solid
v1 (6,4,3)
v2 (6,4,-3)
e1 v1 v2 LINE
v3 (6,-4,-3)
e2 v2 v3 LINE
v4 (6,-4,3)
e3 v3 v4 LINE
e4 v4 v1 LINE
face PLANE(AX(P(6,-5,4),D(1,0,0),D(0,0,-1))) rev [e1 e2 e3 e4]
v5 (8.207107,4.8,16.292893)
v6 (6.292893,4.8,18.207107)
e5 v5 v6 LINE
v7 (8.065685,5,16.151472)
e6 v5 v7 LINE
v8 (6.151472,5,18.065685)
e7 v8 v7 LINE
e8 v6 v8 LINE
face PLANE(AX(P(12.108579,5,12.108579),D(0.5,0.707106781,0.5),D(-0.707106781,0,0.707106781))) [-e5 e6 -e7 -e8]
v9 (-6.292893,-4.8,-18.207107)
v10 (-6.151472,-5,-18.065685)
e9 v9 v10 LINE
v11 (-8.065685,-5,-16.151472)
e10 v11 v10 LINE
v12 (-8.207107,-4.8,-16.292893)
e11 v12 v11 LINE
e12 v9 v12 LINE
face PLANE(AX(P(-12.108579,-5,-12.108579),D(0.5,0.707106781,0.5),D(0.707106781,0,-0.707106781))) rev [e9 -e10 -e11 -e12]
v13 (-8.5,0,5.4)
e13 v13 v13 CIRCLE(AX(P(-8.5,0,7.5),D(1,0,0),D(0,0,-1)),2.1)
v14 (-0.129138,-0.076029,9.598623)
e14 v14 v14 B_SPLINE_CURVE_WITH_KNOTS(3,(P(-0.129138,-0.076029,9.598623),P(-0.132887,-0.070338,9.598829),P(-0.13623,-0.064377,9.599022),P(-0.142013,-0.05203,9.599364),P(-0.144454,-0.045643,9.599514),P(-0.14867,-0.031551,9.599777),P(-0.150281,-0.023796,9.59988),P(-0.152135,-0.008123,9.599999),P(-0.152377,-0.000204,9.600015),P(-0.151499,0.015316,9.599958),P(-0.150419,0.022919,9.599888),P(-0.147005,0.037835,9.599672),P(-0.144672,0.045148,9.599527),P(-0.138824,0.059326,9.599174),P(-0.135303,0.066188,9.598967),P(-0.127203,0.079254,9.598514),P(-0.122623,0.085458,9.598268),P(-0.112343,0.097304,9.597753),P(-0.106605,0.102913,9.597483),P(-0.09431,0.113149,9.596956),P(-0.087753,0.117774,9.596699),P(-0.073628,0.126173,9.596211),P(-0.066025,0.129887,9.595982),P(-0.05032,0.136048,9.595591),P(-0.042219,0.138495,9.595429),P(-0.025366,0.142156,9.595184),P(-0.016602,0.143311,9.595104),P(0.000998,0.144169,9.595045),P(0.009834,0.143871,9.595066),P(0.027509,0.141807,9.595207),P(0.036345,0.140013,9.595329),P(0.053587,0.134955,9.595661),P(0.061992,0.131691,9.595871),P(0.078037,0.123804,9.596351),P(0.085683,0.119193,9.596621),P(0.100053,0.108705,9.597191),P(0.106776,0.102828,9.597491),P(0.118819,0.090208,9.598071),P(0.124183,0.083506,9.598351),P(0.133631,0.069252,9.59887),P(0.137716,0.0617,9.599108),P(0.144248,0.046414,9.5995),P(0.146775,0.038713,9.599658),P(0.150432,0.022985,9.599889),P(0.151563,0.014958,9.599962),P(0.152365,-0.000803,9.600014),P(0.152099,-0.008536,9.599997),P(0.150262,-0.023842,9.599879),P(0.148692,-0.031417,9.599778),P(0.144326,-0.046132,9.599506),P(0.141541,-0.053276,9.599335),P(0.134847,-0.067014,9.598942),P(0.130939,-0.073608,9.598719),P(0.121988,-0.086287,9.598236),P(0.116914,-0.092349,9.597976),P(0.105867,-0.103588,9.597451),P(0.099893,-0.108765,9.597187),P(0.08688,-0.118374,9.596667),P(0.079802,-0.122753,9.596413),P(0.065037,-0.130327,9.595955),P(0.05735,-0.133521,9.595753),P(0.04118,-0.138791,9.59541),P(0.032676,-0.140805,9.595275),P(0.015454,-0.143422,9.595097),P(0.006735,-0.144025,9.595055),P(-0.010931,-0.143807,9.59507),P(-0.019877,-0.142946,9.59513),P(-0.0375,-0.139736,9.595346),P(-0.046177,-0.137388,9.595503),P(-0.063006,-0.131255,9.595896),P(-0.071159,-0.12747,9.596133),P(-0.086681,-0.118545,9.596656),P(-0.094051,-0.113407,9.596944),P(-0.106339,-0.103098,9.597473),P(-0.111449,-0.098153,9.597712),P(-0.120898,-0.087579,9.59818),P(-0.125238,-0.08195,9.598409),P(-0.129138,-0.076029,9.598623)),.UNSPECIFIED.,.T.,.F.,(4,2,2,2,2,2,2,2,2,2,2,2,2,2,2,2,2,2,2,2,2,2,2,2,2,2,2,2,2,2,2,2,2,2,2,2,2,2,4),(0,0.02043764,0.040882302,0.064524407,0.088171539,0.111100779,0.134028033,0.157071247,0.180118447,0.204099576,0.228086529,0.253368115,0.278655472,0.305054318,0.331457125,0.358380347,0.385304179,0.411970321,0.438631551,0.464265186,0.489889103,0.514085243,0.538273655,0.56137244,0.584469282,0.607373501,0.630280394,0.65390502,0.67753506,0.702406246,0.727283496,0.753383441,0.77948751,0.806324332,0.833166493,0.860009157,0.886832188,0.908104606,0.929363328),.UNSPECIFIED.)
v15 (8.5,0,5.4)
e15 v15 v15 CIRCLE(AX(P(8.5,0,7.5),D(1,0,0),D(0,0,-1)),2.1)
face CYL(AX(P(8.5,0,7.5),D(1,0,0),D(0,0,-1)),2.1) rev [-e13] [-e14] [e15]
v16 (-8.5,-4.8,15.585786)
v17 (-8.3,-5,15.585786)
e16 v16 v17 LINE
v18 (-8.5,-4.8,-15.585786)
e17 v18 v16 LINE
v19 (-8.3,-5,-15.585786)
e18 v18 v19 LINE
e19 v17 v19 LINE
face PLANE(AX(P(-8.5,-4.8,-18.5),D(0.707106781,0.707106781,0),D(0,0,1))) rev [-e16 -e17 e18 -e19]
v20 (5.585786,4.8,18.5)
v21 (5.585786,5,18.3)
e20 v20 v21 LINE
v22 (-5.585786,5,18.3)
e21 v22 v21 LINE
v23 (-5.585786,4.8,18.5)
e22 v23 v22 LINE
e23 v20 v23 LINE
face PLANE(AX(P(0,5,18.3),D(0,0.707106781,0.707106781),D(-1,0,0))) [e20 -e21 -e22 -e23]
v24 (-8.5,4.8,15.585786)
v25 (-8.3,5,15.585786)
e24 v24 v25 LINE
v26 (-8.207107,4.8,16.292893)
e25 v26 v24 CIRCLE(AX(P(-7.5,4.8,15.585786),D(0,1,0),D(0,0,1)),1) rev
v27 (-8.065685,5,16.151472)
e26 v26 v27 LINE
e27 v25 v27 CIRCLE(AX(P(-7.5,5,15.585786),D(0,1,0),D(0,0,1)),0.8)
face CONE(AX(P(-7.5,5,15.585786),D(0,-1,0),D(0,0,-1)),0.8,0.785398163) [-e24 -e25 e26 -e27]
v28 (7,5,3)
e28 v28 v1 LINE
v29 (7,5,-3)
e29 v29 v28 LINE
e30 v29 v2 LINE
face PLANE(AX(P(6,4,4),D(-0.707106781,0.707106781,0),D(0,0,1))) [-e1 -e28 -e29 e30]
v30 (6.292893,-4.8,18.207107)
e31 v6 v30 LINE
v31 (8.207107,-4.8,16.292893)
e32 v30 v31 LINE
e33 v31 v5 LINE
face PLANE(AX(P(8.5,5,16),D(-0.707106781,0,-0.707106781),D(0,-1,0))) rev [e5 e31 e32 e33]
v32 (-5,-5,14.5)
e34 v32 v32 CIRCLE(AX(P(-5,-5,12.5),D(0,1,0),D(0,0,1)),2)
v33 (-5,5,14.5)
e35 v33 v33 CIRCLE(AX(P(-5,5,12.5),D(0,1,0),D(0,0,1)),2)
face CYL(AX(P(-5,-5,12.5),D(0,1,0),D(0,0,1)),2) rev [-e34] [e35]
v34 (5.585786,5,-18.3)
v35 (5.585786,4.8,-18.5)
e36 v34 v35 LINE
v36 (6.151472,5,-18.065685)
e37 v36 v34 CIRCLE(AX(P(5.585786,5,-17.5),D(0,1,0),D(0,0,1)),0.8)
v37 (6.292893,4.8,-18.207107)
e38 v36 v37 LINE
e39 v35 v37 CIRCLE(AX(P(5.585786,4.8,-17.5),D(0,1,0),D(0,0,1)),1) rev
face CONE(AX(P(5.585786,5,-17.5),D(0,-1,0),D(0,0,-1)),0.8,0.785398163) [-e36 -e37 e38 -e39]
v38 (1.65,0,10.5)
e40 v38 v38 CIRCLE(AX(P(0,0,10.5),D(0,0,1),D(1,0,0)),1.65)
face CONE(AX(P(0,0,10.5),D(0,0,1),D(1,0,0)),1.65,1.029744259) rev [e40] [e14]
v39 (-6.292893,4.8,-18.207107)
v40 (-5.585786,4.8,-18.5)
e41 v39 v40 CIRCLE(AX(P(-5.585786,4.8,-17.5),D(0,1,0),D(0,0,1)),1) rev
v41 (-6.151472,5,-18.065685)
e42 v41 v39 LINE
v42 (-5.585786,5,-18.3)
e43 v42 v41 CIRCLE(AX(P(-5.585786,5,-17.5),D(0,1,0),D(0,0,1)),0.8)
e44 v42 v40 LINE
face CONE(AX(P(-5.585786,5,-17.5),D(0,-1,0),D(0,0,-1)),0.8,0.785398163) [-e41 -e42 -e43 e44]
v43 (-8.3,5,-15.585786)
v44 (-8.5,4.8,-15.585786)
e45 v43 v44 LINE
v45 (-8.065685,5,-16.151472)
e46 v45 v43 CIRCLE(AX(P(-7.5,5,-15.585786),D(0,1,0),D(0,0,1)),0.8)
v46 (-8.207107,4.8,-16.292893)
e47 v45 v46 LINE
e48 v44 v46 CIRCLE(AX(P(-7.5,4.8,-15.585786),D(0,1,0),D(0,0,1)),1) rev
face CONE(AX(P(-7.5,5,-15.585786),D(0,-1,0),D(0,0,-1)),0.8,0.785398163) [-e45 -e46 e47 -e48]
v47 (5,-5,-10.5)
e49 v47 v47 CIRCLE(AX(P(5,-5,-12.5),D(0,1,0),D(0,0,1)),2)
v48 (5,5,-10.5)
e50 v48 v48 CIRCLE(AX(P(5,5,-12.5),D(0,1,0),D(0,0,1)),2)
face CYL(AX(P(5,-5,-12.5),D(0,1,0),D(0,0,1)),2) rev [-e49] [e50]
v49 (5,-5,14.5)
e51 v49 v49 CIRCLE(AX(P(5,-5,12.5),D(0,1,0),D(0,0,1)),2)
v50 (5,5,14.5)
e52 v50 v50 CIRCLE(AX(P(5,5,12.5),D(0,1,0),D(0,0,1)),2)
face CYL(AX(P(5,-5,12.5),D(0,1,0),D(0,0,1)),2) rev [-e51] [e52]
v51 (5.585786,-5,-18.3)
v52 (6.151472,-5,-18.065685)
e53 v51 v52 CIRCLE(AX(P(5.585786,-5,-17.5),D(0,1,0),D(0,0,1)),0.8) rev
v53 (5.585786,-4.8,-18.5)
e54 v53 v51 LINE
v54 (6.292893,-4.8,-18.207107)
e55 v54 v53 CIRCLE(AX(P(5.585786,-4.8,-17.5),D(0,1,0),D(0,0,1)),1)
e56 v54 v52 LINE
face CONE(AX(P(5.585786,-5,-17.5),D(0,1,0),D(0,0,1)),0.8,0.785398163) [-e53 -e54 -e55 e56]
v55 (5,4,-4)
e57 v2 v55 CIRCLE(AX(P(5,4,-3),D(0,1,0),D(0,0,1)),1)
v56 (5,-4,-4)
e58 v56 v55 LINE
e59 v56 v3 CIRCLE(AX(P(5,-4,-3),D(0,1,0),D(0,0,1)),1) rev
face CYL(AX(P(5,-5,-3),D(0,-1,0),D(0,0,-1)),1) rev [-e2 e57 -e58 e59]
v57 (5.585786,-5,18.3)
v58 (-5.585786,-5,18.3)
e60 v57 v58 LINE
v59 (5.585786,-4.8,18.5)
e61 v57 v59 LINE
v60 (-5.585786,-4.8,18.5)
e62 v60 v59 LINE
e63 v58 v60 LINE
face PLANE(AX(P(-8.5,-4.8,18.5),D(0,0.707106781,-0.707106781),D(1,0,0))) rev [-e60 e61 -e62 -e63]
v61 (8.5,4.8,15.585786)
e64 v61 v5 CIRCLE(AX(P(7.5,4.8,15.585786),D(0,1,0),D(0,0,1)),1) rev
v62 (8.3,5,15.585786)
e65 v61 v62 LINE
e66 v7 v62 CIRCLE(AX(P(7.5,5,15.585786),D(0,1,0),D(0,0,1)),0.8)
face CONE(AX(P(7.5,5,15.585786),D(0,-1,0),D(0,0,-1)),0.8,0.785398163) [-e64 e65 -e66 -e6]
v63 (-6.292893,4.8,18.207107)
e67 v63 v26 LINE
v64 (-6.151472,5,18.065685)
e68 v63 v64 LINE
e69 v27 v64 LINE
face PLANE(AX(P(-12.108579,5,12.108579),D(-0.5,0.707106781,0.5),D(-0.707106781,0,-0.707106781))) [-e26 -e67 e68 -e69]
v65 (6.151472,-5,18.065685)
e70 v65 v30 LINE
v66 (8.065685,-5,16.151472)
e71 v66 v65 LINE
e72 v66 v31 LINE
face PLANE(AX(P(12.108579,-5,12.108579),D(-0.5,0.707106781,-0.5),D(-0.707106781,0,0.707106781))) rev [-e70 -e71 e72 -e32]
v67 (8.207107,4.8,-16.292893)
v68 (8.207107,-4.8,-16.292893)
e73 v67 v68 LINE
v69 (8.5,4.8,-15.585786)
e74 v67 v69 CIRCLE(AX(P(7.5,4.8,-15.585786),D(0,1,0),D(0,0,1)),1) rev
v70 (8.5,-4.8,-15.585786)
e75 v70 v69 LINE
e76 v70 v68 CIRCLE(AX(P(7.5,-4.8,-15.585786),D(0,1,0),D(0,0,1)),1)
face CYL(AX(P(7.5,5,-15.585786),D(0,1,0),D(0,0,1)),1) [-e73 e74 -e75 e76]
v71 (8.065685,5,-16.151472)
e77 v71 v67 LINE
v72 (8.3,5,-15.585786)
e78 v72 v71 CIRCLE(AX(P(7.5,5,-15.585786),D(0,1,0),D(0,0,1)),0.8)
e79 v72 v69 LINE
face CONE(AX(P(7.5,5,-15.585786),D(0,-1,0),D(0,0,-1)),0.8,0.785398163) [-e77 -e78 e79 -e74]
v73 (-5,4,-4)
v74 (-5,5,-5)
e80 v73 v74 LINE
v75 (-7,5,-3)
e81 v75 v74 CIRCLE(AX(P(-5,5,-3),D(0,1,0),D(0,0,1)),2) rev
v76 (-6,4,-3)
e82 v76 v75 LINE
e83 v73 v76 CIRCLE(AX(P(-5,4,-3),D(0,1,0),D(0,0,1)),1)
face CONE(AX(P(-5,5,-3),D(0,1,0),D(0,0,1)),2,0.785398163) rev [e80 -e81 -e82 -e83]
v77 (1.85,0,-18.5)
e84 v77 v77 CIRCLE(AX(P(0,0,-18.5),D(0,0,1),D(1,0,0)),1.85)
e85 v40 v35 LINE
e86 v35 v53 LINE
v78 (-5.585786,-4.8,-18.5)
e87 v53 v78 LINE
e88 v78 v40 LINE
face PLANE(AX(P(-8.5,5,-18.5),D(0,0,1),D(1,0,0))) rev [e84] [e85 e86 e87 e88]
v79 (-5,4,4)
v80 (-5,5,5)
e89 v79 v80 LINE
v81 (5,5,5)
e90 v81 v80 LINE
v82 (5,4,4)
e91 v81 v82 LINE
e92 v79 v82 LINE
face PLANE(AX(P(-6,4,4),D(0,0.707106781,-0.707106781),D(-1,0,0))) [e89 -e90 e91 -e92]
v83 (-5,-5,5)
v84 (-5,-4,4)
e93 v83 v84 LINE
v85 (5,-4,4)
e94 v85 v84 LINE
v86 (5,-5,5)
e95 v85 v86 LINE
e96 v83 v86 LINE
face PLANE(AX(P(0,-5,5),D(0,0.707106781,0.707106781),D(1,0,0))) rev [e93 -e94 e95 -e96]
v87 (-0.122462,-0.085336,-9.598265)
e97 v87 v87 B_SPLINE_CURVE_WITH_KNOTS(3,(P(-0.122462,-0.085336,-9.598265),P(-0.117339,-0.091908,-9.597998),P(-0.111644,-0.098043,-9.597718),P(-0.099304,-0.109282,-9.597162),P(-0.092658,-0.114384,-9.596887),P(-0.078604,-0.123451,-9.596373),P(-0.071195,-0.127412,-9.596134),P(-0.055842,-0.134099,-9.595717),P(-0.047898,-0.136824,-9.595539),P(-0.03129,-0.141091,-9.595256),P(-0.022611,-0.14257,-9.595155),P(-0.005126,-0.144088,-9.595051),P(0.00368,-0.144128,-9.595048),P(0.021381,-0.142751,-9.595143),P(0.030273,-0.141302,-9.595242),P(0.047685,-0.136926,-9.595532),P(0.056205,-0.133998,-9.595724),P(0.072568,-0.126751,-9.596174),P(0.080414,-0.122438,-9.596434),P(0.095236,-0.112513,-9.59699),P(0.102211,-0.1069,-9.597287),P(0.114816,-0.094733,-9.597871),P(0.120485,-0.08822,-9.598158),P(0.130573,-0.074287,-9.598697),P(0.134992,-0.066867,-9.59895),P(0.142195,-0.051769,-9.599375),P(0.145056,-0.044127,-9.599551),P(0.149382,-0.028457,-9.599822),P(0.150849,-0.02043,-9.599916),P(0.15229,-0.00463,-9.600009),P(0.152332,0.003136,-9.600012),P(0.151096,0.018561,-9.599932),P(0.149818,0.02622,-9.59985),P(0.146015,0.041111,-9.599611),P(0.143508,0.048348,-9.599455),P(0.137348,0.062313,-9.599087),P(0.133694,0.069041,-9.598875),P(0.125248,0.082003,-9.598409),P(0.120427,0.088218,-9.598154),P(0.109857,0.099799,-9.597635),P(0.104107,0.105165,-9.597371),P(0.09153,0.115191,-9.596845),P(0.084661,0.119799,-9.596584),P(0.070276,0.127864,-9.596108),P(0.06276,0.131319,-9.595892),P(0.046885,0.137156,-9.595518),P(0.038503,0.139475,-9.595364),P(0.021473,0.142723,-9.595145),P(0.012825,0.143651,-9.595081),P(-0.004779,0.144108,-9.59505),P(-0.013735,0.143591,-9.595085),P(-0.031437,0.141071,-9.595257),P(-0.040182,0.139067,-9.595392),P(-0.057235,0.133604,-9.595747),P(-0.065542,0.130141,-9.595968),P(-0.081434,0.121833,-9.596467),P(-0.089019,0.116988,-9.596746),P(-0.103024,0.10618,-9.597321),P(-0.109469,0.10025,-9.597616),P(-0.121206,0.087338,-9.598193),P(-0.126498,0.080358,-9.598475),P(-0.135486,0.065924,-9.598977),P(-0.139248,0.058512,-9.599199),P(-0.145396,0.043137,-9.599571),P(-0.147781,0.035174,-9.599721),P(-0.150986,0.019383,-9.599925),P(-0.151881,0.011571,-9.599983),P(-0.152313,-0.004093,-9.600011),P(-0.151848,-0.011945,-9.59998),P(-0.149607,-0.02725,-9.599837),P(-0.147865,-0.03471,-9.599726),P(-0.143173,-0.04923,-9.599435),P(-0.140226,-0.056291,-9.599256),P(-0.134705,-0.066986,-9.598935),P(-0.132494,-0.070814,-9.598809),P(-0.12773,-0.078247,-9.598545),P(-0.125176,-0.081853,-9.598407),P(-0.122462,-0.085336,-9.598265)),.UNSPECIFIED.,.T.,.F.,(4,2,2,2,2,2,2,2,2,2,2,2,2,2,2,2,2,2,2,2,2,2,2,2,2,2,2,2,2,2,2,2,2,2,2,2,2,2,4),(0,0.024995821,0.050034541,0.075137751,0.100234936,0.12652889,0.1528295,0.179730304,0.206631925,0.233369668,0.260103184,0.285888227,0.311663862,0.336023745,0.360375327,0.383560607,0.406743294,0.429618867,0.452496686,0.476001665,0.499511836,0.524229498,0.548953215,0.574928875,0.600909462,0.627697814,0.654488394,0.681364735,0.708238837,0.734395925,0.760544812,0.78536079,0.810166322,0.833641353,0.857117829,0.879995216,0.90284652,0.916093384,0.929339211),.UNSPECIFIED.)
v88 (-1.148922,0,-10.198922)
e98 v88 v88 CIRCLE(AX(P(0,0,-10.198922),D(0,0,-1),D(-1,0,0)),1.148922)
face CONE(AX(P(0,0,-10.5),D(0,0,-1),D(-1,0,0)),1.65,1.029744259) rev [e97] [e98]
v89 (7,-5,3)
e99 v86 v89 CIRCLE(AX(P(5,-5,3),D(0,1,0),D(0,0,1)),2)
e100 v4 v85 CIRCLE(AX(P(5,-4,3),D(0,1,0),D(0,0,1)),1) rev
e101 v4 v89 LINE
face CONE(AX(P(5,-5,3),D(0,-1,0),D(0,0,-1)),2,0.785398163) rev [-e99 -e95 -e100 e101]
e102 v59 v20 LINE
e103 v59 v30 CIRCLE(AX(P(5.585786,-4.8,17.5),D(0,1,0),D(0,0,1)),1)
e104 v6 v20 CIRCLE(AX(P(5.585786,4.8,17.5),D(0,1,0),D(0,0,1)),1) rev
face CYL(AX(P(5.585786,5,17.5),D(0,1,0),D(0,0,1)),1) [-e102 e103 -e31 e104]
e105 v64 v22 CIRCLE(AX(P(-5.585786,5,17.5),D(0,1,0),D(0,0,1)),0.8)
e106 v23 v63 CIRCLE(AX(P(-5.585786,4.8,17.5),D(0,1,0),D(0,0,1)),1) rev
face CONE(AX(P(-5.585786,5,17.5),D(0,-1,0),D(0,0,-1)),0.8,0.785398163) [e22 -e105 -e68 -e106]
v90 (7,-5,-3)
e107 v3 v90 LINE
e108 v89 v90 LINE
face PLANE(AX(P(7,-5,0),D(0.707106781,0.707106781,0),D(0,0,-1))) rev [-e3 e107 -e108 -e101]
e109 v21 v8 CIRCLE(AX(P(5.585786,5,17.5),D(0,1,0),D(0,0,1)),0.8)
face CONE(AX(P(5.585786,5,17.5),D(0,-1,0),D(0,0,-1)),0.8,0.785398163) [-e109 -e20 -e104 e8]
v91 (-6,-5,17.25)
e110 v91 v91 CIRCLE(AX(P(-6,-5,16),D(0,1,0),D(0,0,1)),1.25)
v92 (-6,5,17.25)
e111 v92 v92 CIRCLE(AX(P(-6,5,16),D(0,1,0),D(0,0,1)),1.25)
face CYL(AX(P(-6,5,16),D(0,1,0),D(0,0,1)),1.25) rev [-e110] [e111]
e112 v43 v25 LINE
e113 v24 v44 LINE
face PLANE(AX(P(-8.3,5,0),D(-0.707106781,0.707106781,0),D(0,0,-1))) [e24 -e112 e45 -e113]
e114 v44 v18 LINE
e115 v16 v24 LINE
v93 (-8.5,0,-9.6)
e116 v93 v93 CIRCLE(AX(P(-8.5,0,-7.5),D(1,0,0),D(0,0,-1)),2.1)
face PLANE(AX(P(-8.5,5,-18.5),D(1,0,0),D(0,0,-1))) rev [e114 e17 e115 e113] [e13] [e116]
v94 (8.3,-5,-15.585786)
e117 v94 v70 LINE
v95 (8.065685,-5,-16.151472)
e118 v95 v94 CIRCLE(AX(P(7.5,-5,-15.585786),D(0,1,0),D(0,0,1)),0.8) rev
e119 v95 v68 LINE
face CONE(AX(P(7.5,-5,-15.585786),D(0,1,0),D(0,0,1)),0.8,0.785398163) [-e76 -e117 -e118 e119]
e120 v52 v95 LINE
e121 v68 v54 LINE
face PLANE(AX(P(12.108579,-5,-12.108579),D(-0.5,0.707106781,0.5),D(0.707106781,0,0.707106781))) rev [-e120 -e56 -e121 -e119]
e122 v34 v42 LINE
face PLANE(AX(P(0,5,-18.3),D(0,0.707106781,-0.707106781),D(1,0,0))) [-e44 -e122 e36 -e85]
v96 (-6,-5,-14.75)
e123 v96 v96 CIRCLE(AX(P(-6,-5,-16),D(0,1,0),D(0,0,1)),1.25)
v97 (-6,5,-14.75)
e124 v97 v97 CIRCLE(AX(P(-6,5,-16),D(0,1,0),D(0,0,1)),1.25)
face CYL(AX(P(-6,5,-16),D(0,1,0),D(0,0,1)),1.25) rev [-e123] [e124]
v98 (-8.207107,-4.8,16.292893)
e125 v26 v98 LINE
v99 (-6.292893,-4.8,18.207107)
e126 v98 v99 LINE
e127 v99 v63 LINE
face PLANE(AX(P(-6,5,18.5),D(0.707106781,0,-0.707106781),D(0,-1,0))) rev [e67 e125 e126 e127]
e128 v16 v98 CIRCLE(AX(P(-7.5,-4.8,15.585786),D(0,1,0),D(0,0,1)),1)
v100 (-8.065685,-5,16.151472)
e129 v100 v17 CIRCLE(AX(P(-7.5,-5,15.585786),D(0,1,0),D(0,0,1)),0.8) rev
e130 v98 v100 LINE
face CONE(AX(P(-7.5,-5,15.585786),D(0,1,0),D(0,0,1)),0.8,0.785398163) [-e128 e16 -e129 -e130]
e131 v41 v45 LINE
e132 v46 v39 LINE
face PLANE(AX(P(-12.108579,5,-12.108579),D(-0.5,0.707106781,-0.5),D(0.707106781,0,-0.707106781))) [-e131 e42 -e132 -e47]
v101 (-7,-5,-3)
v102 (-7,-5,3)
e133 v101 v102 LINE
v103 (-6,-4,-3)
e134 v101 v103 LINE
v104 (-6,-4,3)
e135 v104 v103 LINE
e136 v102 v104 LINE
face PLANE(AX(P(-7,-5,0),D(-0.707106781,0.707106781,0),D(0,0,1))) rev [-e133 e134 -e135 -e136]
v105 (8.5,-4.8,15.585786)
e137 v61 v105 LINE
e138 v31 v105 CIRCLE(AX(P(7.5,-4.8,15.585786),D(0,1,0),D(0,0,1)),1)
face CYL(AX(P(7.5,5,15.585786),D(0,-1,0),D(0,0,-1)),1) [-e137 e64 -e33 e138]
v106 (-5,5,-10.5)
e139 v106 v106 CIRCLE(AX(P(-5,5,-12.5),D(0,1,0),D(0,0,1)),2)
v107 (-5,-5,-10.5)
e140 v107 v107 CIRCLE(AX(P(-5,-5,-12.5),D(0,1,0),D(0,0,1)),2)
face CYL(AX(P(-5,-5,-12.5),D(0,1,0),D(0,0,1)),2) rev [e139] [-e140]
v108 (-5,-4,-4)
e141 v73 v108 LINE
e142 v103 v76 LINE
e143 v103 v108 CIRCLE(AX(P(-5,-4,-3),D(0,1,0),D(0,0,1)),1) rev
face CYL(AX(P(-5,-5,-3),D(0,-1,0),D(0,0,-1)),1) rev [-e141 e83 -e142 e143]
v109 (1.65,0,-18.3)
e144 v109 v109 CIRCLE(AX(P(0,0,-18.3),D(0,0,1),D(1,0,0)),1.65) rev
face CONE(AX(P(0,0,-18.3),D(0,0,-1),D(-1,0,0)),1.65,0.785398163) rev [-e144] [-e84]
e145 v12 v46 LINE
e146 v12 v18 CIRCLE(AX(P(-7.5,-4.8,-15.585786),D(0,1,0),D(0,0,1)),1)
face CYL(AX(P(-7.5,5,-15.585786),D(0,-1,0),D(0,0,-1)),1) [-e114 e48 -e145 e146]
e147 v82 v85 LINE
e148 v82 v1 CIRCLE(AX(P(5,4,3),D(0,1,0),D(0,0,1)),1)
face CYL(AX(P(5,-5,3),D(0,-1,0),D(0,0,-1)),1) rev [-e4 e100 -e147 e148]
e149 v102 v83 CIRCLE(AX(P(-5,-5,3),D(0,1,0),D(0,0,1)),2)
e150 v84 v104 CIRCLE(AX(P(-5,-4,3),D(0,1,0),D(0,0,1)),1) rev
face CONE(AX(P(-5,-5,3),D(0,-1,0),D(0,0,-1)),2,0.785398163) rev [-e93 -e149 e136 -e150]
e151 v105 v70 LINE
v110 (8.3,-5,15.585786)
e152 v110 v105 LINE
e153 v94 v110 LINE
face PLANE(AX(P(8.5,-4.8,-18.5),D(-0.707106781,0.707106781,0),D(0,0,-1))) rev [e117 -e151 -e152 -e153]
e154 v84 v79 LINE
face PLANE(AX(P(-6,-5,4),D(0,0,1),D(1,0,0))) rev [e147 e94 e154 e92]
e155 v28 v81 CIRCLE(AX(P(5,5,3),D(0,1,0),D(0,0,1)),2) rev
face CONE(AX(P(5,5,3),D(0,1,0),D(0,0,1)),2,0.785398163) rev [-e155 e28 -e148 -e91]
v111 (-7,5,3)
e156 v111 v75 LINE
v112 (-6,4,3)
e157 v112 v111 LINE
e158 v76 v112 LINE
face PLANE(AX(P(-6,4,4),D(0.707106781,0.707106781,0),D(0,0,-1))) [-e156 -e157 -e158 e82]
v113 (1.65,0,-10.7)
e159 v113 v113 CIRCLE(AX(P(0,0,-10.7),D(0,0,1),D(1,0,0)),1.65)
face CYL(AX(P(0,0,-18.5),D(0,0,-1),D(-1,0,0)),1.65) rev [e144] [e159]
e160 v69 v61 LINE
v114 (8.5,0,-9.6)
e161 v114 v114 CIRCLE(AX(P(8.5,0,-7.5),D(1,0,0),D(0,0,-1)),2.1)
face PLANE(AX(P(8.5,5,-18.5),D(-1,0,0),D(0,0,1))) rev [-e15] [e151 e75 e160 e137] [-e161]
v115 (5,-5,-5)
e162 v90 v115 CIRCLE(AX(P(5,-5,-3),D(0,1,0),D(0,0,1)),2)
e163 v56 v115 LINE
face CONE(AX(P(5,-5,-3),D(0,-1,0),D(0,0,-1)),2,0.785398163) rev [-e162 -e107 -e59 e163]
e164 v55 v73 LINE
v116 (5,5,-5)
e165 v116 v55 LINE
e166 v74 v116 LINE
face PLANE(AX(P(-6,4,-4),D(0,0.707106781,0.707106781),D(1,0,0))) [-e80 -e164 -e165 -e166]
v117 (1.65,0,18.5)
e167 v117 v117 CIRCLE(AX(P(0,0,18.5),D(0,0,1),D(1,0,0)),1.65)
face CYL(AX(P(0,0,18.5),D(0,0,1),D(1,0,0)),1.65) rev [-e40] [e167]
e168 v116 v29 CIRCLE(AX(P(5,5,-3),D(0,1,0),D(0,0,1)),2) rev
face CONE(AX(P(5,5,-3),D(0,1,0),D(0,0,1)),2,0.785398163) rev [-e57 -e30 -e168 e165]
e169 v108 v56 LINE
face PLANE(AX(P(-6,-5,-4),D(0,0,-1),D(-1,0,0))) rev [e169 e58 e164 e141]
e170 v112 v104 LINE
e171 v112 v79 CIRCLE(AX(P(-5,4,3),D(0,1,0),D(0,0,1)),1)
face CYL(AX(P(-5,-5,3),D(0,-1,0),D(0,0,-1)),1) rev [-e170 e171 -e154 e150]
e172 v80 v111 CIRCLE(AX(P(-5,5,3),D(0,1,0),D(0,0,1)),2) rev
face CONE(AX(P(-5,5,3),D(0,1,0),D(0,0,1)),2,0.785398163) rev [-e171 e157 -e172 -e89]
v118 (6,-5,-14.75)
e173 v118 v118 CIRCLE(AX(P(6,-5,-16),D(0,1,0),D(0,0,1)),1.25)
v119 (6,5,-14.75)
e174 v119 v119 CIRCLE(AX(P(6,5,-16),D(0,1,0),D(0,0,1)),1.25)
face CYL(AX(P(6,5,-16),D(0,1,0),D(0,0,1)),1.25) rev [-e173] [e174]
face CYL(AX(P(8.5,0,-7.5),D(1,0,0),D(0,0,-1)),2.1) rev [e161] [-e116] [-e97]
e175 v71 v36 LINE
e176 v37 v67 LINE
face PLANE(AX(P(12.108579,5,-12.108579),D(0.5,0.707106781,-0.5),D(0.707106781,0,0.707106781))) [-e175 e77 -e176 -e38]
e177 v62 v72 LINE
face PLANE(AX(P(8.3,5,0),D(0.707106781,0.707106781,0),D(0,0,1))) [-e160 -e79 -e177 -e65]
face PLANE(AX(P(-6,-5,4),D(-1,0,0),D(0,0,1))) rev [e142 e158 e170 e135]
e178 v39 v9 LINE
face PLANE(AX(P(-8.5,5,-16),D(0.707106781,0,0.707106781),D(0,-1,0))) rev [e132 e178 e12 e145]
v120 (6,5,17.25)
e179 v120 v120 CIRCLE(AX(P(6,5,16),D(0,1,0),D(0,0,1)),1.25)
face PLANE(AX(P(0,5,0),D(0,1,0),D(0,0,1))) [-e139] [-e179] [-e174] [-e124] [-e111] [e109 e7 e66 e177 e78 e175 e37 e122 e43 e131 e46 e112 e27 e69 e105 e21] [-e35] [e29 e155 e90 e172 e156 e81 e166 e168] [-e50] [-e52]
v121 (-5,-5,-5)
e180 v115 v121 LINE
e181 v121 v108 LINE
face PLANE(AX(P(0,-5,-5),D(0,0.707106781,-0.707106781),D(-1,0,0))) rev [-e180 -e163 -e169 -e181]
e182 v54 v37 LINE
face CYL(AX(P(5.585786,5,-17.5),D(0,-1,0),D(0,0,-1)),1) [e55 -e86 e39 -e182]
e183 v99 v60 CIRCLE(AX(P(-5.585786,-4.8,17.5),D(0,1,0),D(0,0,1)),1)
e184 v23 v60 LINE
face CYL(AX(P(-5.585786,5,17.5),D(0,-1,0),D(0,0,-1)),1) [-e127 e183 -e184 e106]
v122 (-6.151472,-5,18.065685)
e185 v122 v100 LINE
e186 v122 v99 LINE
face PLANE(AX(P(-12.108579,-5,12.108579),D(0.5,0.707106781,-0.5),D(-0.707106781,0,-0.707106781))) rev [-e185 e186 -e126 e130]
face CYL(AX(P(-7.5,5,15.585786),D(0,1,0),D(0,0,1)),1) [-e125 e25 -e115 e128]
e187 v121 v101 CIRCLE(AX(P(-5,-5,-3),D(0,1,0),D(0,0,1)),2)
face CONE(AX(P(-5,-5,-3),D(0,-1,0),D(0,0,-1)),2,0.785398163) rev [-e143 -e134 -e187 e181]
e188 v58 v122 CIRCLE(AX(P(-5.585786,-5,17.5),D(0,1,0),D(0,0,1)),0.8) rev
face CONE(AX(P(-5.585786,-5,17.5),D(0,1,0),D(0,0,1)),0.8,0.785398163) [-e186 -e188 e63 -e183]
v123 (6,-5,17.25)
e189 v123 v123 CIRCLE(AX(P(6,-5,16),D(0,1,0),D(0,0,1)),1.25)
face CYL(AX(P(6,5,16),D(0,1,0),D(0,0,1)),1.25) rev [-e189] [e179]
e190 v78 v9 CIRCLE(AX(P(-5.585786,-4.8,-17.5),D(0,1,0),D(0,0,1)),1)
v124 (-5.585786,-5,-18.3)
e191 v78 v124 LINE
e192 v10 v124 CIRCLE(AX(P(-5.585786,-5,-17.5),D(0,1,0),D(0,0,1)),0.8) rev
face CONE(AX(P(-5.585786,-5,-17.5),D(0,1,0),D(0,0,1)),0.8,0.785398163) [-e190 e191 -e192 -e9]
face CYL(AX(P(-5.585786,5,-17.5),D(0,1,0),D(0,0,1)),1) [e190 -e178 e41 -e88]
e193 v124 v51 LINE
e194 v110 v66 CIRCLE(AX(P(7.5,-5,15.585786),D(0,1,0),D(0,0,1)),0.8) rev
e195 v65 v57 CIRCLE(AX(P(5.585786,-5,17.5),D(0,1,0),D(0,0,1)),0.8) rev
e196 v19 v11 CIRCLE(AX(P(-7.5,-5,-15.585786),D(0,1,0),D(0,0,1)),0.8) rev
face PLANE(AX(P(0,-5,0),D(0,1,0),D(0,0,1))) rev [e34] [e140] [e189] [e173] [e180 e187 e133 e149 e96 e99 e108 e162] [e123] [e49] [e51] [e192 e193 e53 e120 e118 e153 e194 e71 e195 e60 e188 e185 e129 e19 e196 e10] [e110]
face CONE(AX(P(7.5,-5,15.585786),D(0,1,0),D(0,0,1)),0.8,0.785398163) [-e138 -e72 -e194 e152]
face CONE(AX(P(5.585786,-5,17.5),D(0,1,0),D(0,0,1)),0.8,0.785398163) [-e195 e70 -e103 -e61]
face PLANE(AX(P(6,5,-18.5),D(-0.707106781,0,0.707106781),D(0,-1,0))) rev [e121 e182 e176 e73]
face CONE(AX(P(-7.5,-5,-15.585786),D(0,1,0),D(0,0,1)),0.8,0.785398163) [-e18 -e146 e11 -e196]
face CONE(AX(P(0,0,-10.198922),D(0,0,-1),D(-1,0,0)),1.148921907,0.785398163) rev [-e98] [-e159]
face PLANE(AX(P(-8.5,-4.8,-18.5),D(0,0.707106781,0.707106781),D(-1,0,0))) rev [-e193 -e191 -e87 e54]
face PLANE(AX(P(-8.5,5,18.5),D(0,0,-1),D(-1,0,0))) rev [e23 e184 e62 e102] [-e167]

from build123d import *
from OCP.BRepFilletAPI import BRepFilletAPI_MakeChamfer

# Parameters (mm, degrees)
SKETCH_1_W          = 17
SKETCH_1_H          = 37
EXTRUDE_1_DEPTH     = 5
SKETCH_2_R          = 1.5
CUT_EXTRUDE_1_DEPTH = 26.617376915
SKETCH_3_R          = 1.6
CUT_EXTRUDE_3_DEPTH = 8
SKETCH_4_R          = 1
SKETCH_4_W          = 12
SKETCH_4_H          = 8
CUT_EXTRUDE_4_DEPTH = 23.682592444
CHAMFER_1_SIZE      = 2.5
SKETCH_6_R          = 2
CUT_EXTRUDE_5_DEPTH = 23.682592444
FILLET_1_R          = 1
HOLE_WIZARD_M3_1_D  = 2.5
CHAMFER_2_SIZE      = 0.2
CHAMFER_2_SIZE2     = 0.584574438
CHAMFER_3_SIZE      = 0.2
CHAMFER_4_SIZE      = 1
HOLE_WIZARD_M5_1_D  = 4.2


# Read off the part's stored shape, not the designer's step: M4 螺纹孔1
with BuildPart() as part:
    # 草图1 → 凸台-拉伸1 (new, symmetric)
    with BuildSketch(Plane(origin=(0, 0, 0), x_dir=(1, 0, 0), z_dir=(0, 1, 0))):
        Rectangle(SKETCH_1_W, SKETCH_1_H)
    extrude(amount=EXTRUDE_1_DEPTH, both=True)

    # 草图2 → 切除-拉伸1 (cut, through all)
    with BuildSketch(Plane(origin=(8.5, 0, 0), x_dir=(0, 0, -1), z_dir=(1, 0, 0))):
        with Locations((-7.5, 0)):
            Circle(SKETCH_2_R)
        with Locations((7.5, 0)):
            Circle(SKETCH_2_R)
    extrude(amount=-CUT_EXTRUDE_1_DEPTH, mode=Mode.SUBTRACT)

    # 草图3 → 切除-拉伸3 (cut)
    with BuildSketch(Plane(origin=(0, 0, -18.5), x_dir=(-1, 0, 0), z_dir=(0, 0, -1))):
        Circle(SKETCH_3_R)
    cut_extrude_3 = extrude(amount=-CUT_EXTRUDE_3_DEPTH, mode=Mode.SUBTRACT)

    # 草图4 → 切除-拉伸4 (cut, through all)
    with BuildSketch(Plane(origin=(0, 5, 0), x_dir=(1, 0, 0), z_dir=(0, 1, 0))):
        with Locations(Location((-6, -16, 0), (0, 0, 270))):
            Circle(SKETCH_4_R)
        with Locations(Location((6, -16, 0), (0, 0, 270))):
            Circle(SKETCH_4_R)
        with Locations(Location((6, 16, 0), (0, 0, 270))):
            Circle(SKETCH_4_R)
        with Locations(Location((-6, 16, 0), (0, 0, 270))):
            Circle(SKETCH_4_R)
        Rectangle(SKETCH_4_W, SKETCH_4_H)
    extrude(amount=-CUT_EXTRUDE_4_DEPTH, mode=Mode.SUBTRACT)

    # 镜向1: 切除-拉伸3 across plane
    add(cut_extrude_3.mirror(Plane.XY), mode=Mode.SUBTRACT)

    # 倒角1
    chamfer_1_edges = [part.edges().sort_by_distance(p)[0] for p in [
        (8.5, 0, 18.5),
        (-8.5, 0, 18.5),
        (-8.5, 0, -18.5),
        (8.5, 0, -18.5),
    ]]
    chamfer(chamfer_1_edges, length=CHAMFER_1_SIZE)

    # 草图6 → 切除-拉伸5 (cut, through all)
    with BuildSketch(Plane(origin=(0, 5, 0), x_dir=(1, 0, 0), z_dir=(0, 1, 0))):
        with Locations(Location((5, 12.5, 0), (0, 0, 270))):
            Circle(SKETCH_6_R)
        with Locations(Location((-5, 12.5, 0), (0, 0, 270))):
            Circle(SKETCH_6_R)
        with Locations(Location((5, -12.5, 0), (0, 0, 270))):
            Circle(SKETCH_6_R)
        with Locations(Location((-5, -12.5, 0), (0, 0, 270))):
            Circle(SKETCH_6_R)
    extrude(amount=-CUT_EXTRUDE_5_DEPTH, mode=Mode.SUBTRACT)

    # 圆角1
    fillet_1_edges = [part.edges().sort_by_distance(p)[0] for p in [
        (6, 0, -4),
        (6, 0, 4),
        (-6, 0, 4),
        (-6, 0, -4),
        (-8.5, 0, 16),
        (-8.5, 0, -16),
        (6, 0, -18.5),
        (-6, 0, -18.5),
        (8.5, 0, 16),
        (8.5, 0, -16),
        (-6, 0, 18.5),
        (6, 0, 18.5),
    ]]
    fillet(fillet_1_edges, radius=FILLET_1_R)

    # M4 螺纹孔1 outline → M4 螺纹孔1 (revolve, cut)
    with BuildSketch(Plane.XZ):
        Polygon((0, -9.508579979), (0, -10.5), (1.6, -10.5), (1.6, -18.5), (1.65, -18.5), (1.65, -10.5), align=None)
        Polygon((0, 10.5), (0, 9.508579979), (1.65, 10.5), (1.65, 18.5), (1.6, 18.5), (1.6, 10.5), align=None)
    revolve(axis=Axis((0, 0, 0), (0, 0, 1)), mode=Mode.SUBTRACT)

    # M3 螺纹孔1 (through all)
    with Locations(Plane(origin=(0, 5, 0), x_dir=(1, 0, 0), z_dir=(0, 1, 0))):
        with Locations((-6, -16), (6, -16), (6, 16), (-6, 16)):
            Hole(HOLE_WIZARD_M3_1_D / 2)

    # 倒角2: one chamfer whose edges measure the first distance from different faces: ONE call of the kernel's chamfer builder (chamfer() names one face for all edges)
    chamfer_2_edges_1 = [part.edges().sort_by_distance(p)[0] for p in [
        (-8.5, 5, 0),
        (0, 5, -18.5),
        (-7.25, 5, -17.25),
        (-7.25, 5, 17.25),
        (0, 5, 18.5),
        (7.25, 5, 17.25),
        (8.5, 5, 0),
        (7.25, 5, -17.25),
        (5.96846987, 5, 18.423879533),
        (-8.423879533, 5, -15.96846987),
        (-5.96846987, 5, -18.423879533),
        (5.96846987, 5, -18.423879533),
        (8.423879533, 5, -15.96846987),
        (8.423879533, 5, 15.96846987),
        (-5.96846987, 5, 18.423879533),
        (-8.423879533, 5, 15.96846987),
        (-1.65, 0, -18.5),
    ]]
    chamfer_2_edges_2 = [part.edges().sort_by_distance(p)[0] for p in [
        (-1.65, 0, -10.5),
    ]]
    chamfer_2_side_2 = [part.faces().sort_by_distance(p)[0] for p in [
        (-1.65, 0, -14.5),
    ]]
    chamfer_2 = BRepFilletAPI_MakeChamfer(part.part.solid().wrapped)
    for e in chamfer_2_edges_1:
        chamfer_2.Add(CHAMFER_2_SIZE, e.wrapped)
    for e in chamfer_2_edges_2:
        chamfer_2.Add(CHAMFER_2_SIZE, CHAMFER_2_SIZE2, e.wrapped, chamfer_2_side_2[0].wrapped)  # the first distance lies on this face
    add(Compound.cast(chamfer_2.Shape()), mode=Mode.REPLACE)

    # 倒角3
    chamfer_3_edges = [part.edges().sort_by_distance(p)[0] for p in [
        (-8.5, -5, 0),
        (-7.25, -5, 17.25),
        (-7.25, -5, -17.25),
        (0, -5, -18.5),
        (7.25, -5, -17.25),
        (8.5, -5, 0),
        (7.25, -5, 17.25),
        (0, -5, 18.5),
        (5.96846987, -5, 18.423879533),
        (-8.423879533, -5, -15.96846987),
        (-5.96846987, -5, -18.423879533),
        (5.96846987, -5, -18.423879533),
        (8.423879533, -5, -15.96846987),
        (8.423879533, -5, 15.96846987),
        (-5.96846987, -5, 18.423879533),
        (-8.423879533, -5, 15.96846987),
    ]]
    chamfer(chamfer_3_edges, length=CHAMFER_3_SIZE)

    # 倒角4
    chamfer_4_edges = [part.edges().sort_by_distance(p)[0] for p in [
        (6, 5, 0),
        (0, 5, 4),
        (-6, 5, 0),
        (0, 5, -4),
        (0, -5, 4),
        (6, -5, 0),
        (0, -5, -4),
        (-6, -5, 0),
        (-5.707106781, 5, 3.707106781),
        (-5.707106781, -5, 3.707106781),
        (-5.707106781, 5, -3.707106781),
        (-5.707106781, -5, -3.707106781),
        (5.707106781, 5, -3.707106781),
        (5.707106781, -5, -3.707106781),
        (5.707106781, 5, 3.707106781),
        (5.707106781, -5, 3.707106781),
    ]]
    chamfer(chamfer_4_edges, length=CHAMFER_4_SIZE)

    # M5 螺纹孔1 (through all)
    with Locations(Plane(origin=(8.5, 0, 0), x_dir=(0, 0, -1), z_dir=(1, 0, 0))):
        with Locations((-7.5, 0), (7.5, 0)):
            Hole(HOLE_WIZARD_M5_1_D / 2)


solid = part.part
